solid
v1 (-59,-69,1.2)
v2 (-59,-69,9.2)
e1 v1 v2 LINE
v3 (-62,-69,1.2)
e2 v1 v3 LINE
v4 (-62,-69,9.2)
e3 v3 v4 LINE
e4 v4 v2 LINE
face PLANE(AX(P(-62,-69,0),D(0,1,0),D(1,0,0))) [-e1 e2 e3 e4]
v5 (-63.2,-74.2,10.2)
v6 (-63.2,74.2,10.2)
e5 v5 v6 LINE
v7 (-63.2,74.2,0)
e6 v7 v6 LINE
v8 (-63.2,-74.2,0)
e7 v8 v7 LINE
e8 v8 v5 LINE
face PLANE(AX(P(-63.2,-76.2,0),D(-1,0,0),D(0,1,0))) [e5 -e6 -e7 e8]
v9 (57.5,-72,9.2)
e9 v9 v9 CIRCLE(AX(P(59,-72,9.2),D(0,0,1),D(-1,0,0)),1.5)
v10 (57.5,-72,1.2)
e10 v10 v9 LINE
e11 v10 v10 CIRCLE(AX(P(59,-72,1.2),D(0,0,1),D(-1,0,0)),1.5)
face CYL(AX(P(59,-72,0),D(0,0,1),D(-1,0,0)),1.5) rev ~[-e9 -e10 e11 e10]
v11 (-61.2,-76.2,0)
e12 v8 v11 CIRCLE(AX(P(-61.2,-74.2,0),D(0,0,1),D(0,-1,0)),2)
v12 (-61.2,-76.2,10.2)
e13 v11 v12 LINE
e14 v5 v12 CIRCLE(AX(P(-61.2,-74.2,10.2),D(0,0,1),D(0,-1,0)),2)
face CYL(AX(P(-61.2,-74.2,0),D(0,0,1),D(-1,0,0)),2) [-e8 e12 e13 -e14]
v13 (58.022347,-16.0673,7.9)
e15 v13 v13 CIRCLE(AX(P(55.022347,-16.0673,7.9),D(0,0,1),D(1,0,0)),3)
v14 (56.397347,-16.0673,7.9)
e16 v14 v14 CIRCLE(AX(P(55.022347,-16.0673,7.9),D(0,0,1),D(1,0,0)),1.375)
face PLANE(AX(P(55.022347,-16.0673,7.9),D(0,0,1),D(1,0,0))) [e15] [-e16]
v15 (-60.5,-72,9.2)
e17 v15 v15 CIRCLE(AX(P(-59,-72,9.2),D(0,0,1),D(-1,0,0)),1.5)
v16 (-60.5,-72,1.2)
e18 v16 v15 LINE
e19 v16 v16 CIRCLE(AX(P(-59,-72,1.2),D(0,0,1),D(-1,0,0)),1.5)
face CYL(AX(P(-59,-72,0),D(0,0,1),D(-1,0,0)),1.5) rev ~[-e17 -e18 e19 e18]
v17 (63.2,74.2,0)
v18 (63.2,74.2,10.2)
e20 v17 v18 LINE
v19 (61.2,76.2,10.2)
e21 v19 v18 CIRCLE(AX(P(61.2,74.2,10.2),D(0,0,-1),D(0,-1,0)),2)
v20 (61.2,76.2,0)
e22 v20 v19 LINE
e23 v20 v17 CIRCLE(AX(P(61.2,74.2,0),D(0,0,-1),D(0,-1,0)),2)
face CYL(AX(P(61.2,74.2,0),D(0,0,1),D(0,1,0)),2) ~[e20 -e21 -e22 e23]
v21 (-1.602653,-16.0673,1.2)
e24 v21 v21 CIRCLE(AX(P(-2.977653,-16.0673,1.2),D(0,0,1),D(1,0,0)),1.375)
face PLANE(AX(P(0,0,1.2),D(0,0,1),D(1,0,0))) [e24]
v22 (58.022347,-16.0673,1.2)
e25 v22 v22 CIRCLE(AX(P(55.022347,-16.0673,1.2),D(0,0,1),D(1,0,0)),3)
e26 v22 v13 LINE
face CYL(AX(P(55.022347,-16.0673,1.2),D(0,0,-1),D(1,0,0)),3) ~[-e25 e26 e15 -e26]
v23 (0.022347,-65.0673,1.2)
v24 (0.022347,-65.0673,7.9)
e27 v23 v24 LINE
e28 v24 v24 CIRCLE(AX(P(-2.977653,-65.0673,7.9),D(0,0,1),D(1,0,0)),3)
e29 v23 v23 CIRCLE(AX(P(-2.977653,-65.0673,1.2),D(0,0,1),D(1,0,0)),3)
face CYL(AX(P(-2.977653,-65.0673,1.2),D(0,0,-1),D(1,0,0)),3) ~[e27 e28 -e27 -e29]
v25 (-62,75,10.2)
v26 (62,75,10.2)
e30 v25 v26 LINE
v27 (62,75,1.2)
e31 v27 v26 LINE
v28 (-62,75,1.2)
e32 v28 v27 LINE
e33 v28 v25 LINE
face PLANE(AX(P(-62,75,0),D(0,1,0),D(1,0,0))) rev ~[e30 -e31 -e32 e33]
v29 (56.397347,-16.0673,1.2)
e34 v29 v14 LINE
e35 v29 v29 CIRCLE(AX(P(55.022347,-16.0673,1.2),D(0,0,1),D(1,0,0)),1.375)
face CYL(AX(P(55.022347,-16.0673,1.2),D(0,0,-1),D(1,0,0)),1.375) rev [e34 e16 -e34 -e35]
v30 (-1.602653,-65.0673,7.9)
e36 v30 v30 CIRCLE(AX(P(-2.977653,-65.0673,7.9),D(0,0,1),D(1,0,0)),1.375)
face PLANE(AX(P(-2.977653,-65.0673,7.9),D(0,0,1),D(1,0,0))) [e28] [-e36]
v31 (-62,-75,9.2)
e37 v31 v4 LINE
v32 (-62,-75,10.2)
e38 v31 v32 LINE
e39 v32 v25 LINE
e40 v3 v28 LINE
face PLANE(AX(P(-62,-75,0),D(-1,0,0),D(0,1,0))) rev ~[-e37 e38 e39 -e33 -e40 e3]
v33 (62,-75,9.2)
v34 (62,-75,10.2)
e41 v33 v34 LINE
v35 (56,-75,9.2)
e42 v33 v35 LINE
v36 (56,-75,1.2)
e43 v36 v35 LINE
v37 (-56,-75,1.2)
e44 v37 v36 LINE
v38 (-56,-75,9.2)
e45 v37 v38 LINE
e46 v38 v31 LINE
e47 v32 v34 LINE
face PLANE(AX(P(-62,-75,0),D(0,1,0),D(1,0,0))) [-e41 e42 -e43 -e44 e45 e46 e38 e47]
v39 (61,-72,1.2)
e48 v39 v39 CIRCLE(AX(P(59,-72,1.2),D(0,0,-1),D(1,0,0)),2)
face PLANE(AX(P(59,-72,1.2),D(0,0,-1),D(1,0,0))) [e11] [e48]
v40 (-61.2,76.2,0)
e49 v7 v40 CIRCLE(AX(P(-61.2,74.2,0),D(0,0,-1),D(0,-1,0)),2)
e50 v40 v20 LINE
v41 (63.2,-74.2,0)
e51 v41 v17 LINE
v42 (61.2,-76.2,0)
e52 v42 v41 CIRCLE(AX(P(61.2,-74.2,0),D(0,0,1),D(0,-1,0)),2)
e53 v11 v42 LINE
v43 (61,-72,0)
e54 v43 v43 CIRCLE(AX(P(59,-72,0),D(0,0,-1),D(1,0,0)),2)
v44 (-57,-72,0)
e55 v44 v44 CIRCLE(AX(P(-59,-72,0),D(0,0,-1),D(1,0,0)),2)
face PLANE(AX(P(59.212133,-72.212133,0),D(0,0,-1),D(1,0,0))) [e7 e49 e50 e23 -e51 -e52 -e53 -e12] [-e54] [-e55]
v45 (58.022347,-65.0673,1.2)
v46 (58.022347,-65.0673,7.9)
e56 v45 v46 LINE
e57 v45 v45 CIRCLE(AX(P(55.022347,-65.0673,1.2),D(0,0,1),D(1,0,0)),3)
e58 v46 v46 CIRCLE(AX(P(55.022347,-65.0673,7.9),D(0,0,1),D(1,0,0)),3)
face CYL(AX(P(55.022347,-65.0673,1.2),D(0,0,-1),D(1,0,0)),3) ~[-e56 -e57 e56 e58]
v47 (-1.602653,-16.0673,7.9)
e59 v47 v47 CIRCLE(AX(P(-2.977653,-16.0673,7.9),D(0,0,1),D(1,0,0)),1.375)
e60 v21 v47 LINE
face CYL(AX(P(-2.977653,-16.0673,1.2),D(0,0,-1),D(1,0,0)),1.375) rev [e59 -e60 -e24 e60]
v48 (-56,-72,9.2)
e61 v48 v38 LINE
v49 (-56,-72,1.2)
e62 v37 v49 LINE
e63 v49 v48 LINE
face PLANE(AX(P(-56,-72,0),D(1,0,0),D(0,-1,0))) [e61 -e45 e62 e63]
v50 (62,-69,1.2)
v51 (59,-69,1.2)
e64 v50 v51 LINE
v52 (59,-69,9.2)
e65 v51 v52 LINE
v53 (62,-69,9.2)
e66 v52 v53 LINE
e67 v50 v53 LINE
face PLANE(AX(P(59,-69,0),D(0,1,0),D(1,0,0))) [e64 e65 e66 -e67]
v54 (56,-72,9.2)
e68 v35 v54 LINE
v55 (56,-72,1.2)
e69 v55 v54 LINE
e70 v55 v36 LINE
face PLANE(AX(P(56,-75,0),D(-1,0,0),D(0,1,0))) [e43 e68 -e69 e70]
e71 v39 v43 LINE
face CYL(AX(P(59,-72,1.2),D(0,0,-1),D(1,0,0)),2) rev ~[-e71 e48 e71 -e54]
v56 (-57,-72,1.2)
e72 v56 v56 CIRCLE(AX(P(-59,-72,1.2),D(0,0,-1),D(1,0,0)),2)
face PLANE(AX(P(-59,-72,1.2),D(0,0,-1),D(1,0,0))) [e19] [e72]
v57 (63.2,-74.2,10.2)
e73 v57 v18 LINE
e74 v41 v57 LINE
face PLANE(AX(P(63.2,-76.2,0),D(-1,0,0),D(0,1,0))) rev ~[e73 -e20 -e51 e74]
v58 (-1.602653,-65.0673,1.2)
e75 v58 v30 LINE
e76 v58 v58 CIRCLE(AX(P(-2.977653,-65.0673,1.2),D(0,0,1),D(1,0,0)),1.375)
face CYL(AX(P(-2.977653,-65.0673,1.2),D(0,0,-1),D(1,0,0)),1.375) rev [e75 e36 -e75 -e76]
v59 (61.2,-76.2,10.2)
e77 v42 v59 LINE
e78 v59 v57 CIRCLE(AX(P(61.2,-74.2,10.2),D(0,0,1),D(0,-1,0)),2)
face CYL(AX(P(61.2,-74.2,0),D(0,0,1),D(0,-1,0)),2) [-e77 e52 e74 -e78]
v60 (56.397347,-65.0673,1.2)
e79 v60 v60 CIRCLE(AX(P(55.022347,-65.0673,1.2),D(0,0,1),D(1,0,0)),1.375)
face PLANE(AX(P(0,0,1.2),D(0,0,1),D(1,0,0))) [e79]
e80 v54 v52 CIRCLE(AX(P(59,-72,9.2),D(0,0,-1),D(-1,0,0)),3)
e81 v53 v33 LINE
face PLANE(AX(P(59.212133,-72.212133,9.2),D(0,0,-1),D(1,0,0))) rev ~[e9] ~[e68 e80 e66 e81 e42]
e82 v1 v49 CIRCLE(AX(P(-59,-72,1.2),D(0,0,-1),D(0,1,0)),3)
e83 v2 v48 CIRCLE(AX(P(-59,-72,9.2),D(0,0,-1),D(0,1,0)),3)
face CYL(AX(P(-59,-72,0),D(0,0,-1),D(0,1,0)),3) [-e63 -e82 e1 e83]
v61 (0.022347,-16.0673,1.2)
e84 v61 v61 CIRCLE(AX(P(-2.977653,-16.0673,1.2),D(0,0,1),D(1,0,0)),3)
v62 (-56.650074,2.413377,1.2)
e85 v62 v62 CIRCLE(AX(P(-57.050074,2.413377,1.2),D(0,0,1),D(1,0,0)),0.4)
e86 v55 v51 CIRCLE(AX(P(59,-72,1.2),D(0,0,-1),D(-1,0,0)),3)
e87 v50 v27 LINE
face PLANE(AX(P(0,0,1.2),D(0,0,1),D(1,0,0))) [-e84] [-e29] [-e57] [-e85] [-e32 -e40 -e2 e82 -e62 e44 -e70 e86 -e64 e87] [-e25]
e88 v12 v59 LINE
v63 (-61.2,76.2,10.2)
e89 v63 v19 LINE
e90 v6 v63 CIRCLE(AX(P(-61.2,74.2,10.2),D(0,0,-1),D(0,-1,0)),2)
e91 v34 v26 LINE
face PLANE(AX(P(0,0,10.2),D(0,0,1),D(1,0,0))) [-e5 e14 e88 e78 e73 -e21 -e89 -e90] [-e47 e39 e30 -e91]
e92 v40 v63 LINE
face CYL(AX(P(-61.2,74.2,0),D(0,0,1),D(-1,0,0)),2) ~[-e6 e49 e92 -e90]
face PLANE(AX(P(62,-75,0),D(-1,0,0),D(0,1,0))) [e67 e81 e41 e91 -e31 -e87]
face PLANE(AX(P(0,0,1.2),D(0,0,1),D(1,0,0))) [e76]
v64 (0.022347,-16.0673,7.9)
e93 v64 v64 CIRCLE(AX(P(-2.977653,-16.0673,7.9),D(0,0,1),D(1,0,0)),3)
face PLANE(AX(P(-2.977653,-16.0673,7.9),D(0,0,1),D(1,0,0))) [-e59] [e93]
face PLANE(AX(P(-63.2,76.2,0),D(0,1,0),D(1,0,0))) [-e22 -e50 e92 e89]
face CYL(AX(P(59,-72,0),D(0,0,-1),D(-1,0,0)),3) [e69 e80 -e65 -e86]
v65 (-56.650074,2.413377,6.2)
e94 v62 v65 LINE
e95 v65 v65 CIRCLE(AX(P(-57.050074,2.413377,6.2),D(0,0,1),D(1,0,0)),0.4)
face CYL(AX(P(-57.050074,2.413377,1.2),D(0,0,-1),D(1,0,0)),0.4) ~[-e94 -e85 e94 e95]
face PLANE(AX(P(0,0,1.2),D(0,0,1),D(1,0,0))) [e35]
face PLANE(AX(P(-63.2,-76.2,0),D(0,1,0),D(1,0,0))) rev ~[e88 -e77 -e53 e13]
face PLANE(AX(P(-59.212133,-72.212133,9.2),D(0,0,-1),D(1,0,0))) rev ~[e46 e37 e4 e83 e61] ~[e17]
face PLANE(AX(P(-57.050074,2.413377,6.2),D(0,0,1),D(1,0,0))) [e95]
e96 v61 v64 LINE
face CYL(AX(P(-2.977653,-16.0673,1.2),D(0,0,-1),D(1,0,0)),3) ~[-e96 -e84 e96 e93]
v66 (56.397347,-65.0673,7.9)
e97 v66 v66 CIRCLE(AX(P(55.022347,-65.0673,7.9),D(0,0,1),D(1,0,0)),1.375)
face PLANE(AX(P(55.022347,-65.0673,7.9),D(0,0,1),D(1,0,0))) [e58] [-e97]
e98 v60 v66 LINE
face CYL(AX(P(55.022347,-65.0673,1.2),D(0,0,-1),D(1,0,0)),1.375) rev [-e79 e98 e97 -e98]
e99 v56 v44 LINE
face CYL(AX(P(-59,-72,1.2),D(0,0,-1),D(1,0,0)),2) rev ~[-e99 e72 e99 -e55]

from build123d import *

# Parameters (mm, degrees)
F0_W           = 126.4
F0_H           = 152.4
F0_W_2         = 124
F0_H_2         = 150
F1_DEPTH       = 10.2
F2_DEPTH       = 1.2
F3_R           = 2
F4_R           = 1.5
F5_DEPTH       = 9.2
F6_D           = 3
F6_CBORE_D     = 4
F6_CBORE_DEPTH = 1.2
F7_R           = 3
F7_R_2         = 1.375
F8_DEPTH       = 6.7
F7_R_3         = 0.4
F9_DEPTH       = 5


# Not quite as in the source:
# - a feature names something its author has since deleted; it is built from what else it names


with BuildPart() as f1:
    # F0 (on Top) → F1 (new body)
    with BuildSketch(Plane.XY):
        Rectangle(F0_W, F0_H)
        Rectangle(F0_W_2, F0_H_2, mode=Mode.SUBTRACT)
    extrude(amount=F1_DEPTH)

    # F0 (on Top) → F2 (join)
    with BuildSketch(Plane.XY):
        Rectangle(F0_W_2, F0_H_2)
    extrude(amount=F2_DEPTH)

    # F3
    f3_edges = [f1.edges().sort_by_distance(p)[0] for p in [
        (63.2, -76.2, 5.1),
        (-63.2, 76.2, 5.1),
        (63.2, 76.2, 5.1),
        (-63.2, -76.2, 5.1),
    ]]
    fillet(f3_edges, radius=F3_R)

    # F4 (on face) → F5 (join)
    with BuildSketch(Plane(origin=(0, 0, 0), x_dir=(1, 0, 0), z_dir=(0, 0, -1))):
        with BuildLine():
            Line((62, 69), (62, 75))
            Line((62, 75), (56, 75))
            Line((56, 75), (56, 72))
            ThreePointArc((56, 72), (56.8786796564, 69.8786796564), (59, 69))
            Line((59, 69), (62, 69))
        make_face()
        with Locations((59, 72)):
            Circle(F4_R, mode=Mode.SUBTRACT)
        with Locations((59, 72)):
            Circle(F4_R)
        with BuildLine():
            Line((-56, 75), (-62, 75))
            Line((-62, 75), (-62, 69))
            Line((-62, 69), (-59, 69))
            ThreePointArc((-59, 69), (-56.8786796564, 69.8786796564), (-56, 72))
            Line((-56, 72), (-56, 75))
        make_face()
        with Locations((-59, 72)):
            Circle(F4_R, mode=Mode.SUBTRACT)
        with Locations((-59, 72)):
            Circle(F4_R)
    extrude(amount=-F5_DEPTH)

    # F6 (through all)
    with Locations(Plane(origin=(0, 0, 0), x_dir=(1, 0, 0), z_dir=(0, 0, -1))):
        with Locations((59, 72), (-59, 72)):
            CounterBoreHole(F6_D / 2, F6_CBORE_D / 2, F6_CBORE_DEPTH)

    # F7 (on face) → F8 (join)
    with BuildSketch(Plane.XY.offset(1.2)):
        with Locations((55.0223472919, -16.0672999918)):
            Circle(F7_R)
        with Locations((55.0223472919, -16.0672999918)):
            Circle(F7_R_2, mode=Mode.SUBTRACT)
        with Locations((-2.9776527081, -16.0672999918)):
            Circle(F7_R)
        with Locations((-2.9776527081, -16.0672999918)):
            Circle(F7_R_2, mode=Mode.SUBTRACT)
        with Locations((-2.9776527081, -65.0672999918)):
            Circle(F7_R)
        with Locations((-2.9776527081, -65.0672999918)):
            Circle(F7_R_2, mode=Mode.SUBTRACT)
        with Locations((55.0223472919, -65.0672999918)):
            Circle(F7_R)
        with Locations((55.0223472919, -65.0672999918)):
            Circle(F7_R_2, mode=Mode.SUBTRACT)
    extrude(amount=F8_DEPTH)

    # F7 (on face) → F9 (join)
    with BuildSketch(Plane.XY.offset(1.2)):
        with Locations((-57.0500735752, 2.4133773954)):
            Circle(F7_R_3)
    extrude(amount=F9_DEPTH)


solid = f1.part
